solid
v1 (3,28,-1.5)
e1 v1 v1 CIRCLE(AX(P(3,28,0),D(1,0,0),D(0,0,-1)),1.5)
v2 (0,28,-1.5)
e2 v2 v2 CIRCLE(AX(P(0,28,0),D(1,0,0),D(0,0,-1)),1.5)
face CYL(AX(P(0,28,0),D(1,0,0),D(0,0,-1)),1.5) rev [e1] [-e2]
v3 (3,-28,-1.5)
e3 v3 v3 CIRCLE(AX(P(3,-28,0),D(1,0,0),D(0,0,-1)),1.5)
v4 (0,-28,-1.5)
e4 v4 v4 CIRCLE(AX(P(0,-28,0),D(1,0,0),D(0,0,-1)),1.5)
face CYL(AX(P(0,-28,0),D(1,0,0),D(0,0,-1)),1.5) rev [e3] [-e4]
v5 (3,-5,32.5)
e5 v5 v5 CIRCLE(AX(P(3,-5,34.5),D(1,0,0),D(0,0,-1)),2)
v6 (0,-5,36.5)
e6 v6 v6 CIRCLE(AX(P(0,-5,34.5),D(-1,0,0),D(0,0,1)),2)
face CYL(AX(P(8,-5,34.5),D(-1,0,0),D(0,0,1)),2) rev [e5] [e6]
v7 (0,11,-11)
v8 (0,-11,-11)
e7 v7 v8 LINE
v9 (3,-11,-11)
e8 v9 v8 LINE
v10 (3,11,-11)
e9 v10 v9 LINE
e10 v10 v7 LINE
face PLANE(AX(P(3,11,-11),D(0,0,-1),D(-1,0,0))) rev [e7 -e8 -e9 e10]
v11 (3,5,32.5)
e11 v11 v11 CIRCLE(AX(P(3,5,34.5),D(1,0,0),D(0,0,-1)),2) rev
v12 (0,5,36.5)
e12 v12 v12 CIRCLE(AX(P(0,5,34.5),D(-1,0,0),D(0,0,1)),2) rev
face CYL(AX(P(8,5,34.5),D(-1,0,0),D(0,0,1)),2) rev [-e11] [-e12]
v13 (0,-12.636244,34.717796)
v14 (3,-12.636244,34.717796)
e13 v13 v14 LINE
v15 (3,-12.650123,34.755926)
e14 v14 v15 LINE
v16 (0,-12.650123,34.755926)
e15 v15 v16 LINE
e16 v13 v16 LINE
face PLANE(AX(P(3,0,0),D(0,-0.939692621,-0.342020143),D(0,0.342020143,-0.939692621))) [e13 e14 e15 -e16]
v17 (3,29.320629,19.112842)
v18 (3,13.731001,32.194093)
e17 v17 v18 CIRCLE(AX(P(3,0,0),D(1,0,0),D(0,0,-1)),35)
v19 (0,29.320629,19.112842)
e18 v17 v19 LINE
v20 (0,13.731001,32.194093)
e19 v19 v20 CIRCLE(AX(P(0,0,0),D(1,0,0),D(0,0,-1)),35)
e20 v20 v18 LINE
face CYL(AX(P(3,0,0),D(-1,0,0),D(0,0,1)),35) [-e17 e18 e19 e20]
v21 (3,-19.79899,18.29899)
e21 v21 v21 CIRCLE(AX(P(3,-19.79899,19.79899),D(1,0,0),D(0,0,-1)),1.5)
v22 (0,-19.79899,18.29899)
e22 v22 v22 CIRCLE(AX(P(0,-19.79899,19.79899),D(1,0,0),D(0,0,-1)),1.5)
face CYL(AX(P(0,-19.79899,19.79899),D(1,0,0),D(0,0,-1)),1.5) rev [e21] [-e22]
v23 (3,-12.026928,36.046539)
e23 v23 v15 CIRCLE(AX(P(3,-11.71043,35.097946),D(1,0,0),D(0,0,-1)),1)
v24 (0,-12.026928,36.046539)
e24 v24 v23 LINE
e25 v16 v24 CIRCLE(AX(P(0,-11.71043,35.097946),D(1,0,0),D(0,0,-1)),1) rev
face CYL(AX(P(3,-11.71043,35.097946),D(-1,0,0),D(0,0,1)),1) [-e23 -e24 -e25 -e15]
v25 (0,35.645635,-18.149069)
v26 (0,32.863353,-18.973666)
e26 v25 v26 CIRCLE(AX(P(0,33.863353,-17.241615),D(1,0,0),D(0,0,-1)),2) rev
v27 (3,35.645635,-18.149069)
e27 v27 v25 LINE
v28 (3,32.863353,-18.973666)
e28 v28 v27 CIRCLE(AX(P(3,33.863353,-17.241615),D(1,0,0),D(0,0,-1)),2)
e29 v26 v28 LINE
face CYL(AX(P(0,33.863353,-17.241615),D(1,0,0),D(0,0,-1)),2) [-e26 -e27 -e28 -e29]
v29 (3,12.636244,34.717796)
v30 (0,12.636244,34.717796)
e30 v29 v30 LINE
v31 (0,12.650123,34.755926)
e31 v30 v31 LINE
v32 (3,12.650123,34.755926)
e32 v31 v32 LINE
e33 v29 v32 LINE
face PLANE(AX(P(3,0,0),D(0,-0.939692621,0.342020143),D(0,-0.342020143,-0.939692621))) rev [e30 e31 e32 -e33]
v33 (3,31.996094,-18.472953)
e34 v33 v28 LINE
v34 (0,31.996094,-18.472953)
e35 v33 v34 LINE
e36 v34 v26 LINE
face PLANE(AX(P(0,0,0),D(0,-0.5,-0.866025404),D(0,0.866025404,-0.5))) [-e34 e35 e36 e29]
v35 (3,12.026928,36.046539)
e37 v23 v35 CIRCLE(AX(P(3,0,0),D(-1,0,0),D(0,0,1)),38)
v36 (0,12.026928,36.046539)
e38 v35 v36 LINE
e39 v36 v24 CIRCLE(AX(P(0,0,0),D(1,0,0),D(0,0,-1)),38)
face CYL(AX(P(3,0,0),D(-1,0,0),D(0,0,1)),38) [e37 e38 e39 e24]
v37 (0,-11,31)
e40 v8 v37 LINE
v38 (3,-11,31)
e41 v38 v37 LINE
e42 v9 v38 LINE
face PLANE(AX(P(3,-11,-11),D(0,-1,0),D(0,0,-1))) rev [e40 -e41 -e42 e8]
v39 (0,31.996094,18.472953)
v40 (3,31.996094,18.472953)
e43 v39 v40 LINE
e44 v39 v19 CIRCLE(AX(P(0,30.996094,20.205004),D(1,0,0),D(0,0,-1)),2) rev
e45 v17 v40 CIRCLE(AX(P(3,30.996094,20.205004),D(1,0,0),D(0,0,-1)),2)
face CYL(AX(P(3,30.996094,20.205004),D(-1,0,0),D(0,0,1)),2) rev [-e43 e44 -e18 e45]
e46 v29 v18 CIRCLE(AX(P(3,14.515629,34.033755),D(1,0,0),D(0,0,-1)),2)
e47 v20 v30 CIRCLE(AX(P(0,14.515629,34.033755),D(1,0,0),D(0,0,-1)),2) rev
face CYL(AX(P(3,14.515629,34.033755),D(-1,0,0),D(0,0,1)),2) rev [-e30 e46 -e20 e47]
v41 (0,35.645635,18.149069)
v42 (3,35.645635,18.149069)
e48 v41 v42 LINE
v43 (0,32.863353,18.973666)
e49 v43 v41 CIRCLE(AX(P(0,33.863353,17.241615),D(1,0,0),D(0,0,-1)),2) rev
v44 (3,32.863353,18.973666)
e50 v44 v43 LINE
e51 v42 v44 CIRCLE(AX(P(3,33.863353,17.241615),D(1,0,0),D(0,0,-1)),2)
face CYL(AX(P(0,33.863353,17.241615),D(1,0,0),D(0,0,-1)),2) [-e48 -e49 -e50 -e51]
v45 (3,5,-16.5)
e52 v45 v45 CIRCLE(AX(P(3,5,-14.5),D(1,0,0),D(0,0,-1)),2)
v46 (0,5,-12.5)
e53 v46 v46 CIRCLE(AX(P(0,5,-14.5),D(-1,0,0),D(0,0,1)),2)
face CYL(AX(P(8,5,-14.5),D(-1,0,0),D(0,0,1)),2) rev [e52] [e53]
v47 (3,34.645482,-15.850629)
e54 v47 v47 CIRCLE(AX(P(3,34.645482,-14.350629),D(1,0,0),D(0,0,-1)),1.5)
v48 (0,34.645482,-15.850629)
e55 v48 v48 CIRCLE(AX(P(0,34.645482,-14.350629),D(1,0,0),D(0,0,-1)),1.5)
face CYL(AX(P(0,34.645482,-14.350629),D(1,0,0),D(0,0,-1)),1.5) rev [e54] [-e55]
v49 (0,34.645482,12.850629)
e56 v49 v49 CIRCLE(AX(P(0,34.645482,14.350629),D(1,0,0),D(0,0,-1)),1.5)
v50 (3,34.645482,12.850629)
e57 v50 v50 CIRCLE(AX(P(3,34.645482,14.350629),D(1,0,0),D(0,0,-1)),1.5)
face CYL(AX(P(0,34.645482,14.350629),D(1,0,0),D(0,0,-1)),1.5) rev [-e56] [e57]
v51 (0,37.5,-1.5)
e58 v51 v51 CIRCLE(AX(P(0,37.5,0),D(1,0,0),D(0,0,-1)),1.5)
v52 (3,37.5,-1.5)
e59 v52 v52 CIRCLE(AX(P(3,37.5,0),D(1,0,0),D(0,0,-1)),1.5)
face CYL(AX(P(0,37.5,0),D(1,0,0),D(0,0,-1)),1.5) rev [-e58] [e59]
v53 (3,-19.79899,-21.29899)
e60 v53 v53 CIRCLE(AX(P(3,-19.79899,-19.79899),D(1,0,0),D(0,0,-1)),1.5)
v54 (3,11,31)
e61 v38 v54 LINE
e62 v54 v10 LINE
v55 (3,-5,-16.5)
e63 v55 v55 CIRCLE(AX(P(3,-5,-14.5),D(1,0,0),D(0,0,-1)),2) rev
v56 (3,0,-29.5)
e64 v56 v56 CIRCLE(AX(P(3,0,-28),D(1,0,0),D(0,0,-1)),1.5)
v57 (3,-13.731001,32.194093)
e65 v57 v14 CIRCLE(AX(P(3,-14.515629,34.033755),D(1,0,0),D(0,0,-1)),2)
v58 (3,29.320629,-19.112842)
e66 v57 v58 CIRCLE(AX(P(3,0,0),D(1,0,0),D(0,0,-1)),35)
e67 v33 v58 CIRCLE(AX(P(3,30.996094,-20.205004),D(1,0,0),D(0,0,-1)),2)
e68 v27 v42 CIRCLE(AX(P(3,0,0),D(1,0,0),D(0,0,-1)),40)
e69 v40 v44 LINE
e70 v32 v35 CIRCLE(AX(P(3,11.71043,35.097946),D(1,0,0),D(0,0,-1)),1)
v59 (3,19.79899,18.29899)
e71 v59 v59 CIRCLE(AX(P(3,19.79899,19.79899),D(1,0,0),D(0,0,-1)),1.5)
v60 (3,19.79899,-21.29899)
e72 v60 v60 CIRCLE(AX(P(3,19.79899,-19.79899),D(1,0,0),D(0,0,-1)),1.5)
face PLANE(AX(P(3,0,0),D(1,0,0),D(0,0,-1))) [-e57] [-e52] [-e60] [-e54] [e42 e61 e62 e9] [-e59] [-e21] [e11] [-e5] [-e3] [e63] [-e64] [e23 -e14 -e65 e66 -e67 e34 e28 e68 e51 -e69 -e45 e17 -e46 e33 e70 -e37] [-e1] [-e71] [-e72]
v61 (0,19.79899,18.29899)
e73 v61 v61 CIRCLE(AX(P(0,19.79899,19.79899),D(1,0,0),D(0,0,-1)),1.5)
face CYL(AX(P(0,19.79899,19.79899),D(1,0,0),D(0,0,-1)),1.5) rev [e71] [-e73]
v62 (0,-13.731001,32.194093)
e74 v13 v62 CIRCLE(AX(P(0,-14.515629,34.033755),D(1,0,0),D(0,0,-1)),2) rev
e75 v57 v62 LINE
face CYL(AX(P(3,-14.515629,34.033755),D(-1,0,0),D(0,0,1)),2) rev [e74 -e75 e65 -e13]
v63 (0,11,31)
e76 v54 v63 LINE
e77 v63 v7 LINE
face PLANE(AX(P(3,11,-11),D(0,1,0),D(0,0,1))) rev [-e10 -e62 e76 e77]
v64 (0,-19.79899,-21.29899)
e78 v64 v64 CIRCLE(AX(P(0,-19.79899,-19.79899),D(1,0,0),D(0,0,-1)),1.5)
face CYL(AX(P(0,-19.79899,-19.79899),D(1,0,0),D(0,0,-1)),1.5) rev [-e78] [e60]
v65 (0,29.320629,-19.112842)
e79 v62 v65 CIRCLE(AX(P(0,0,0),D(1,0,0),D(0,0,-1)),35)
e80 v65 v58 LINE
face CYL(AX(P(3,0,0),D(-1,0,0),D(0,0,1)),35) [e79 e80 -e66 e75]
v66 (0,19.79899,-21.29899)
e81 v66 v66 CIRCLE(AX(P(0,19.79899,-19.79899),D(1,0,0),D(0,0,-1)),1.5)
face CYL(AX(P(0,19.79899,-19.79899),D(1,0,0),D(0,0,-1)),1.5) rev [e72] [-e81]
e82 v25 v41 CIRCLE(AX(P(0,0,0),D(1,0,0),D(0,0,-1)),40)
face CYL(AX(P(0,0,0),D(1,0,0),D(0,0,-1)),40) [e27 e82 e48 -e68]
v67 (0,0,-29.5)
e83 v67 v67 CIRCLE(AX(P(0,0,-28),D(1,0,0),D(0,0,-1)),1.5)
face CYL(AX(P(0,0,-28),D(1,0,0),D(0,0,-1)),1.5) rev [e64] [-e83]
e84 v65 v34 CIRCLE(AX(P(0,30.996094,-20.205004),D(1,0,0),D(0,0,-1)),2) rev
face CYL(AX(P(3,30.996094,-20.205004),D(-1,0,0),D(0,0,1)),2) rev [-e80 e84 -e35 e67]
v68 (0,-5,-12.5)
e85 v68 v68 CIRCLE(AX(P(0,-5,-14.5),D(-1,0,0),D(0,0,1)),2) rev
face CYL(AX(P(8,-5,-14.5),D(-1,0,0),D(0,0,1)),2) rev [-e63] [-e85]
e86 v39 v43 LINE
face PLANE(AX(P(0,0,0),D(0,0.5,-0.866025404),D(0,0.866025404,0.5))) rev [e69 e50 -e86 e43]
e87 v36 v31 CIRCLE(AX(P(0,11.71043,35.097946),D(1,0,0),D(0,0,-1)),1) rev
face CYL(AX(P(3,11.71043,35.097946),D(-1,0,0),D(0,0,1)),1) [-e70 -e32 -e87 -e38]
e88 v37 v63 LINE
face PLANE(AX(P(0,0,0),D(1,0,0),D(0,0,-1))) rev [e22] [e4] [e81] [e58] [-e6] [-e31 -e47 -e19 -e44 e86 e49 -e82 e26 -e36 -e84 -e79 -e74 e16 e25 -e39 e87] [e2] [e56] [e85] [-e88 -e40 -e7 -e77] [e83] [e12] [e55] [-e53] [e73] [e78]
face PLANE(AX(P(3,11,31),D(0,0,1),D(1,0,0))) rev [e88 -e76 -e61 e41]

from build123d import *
from build123d.topology import SkipClean

# Parameters (mm, degrees)
SKETCH_1_R               = 35
EXTRUDE_1_DEPTH          = 3
SKETCH_2_R               = 1.5
CUT_EXTRUDE_1_DEPTH      = 3
SKETCH_3_R               = 1.5
CUT_EXTRUDE_2_DEPTH      = 3
SKETCH_4_R               = 12.5
CUT_EXTRUDE_3_DEPTH      = 3
EXTRUDE_START            = -3
EXTRUDE_4_DEPTH          = 3
FILLET_1_R               = 2
FILLET_2_R               = 2
FILLET_3_R               = 2
FILLET_4_R               = 2
SKETCH_6_R               = 1.5
CUT_EXTRUDE_4_DEPTH      = 3
SKETCH_7_R               = 2
CUT_EXTRUDE_5_DEPTH      = 8
EXTRUDE_7_DEPTH          = 3
SKETCH_10_W              = 42
SKETCH_10_H              = 22
CUT_EXTRUDE_6_DEPTH      = 3
SKETCH_11_R              = 12.5
SKETCH_11_R_2            = 1.5
EXTRUDE_9_DEPTH          = 3
SKETCH_12_W              = 42
SKETCH_12_H              = 22
CUT_EXTRUDE_7_DEPTH      = 3
EXTRUDE_11_DEPTH         = 3
SKETCH_14_R              = 1.5
EXTRUDE_12_DEPTH         = 3
FILLET_5_R               = 2
FILLET_6_R               = 2
FILLET_7_R               = 2
FILLET_8_R               = 2
CUT_EXTRUDE_8_DEPTH      = 57.648036153
CUT_EXTRUDE_8_DEPTH_BACK = 57.648036153
FILLET_9_R               = 1
FILLET_10_R              = 1


with BuildPart() as part:
    # 草图1 → 凸台-拉伸1 (new body)
    with BuildSketch(Plane(origin=(0, 0, 0), x_dir=(0, 0, -1), z_dir=(1, 0, 0))):
        Circle(SKETCH_1_R)
    extrude(amount=EXTRUDE_1_DEPTH)

    # 草图2 → 切除-拉伸1 (cut)
    with BuildSketch(Plane(origin=(3, 0, 0), x_dir=(0, 0, -1), z_dir=(1, 0, 0))):
        with Locations((0, 28)):
            Circle(SKETCH_2_R)
        with Locations((19.798989873, 19.798989873)):
            Circle(SKETCH_2_R)
        with Locations((28, 0)):
            Circle(SKETCH_2_R)
        with Locations((19.798989873, -19.798989873)):
            Circle(SKETCH_2_R)
        with Locations((0, -28)):
            Circle(SKETCH_2_R)
        with Locations((-19.798989873, -19.798989873)):
            Circle(SKETCH_2_R)
        with Locations((-28, 0)):
            Circle(SKETCH_2_R)
        with Locations((-19.798989873, 19.798989873)):
            Circle(SKETCH_2_R)
    extrude(amount=-CUT_EXTRUDE_1_DEPTH, mode=Mode.SUBTRACT)

    # 草图3 → 切除-拉伸2 (cut)
    with BuildSketch(Plane(origin=(3, 0, 0), x_dir=(0, 0, -1), z_dir=(1, 0, 0))):
        with Locations((0, 17.5)):
            Circle(SKETCH_3_R)
        with Locations((12.374368671, 12.374368671)):
            Circle(SKETCH_3_R)
        with Locations((17.5, 0)):
            Circle(SKETCH_3_R)
        with Locations((12.374368671, -12.374368671)):
            Circle(SKETCH_3_R)
        with Locations((0, -17.5)):
            Circle(SKETCH_3_R)
        with Locations((-12.374368671, -12.374368671)):
            Circle(SKETCH_3_R)
        with Locations((-17.5, 0)):
            Circle(SKETCH_3_R)
        with Locations((-12.374368671, 12.374368671)):
            Circle(SKETCH_3_R)
    extrude(amount=-CUT_EXTRUDE_2_DEPTH, mode=Mode.SUBTRACT)

    # 草图4 → 切除-拉伸3 (cut)
    with BuildSketch(Plane.ZY):
        Circle(SKETCH_4_R)
    extrude(amount=-CUT_EXTRUDE_3_DEPTH, mode=Mode.SUBTRACT)

    # 草图5 → 凸台-拉伸4 (add)
    with BuildSketch(Plane(origin=(3, 0, 0), x_dir=(0, 0, -1), z_dir=(1, 0, 0)).offset(EXTRUDE_START)):
        with BuildLine():
            Line((-20, 34.641016151), (-17.5, 30.310889132))
            ThreePointArc((-17.5, 30.310889132), (-9.058666579, 33.80740392), (0, 35))
            Line((0, 35), (0, 40))
            ThreePointArc((0, 40), (-10.352761804, 38.637033052), (-20, 34.641016151))
        make_face()
        with BuildLine():
            ThreePointArc((0, 35), (9.058666579, 33.80740392), (17.5, 30.310889132))
            Line((17.5, 30.310889132), (20, 34.641016151))
            ThreePointArc((20, 34.641016151), (10.352761804, 38.637033052), (0, 40))
            Line((0, 40), (0, 35))
        make_face()
    extrude(amount=EXTRUDE_4_DEPTH)

    # 圆角1
    fillet_1_edges = [part.edges().sort_by_distance(p)[0] for p in [
        (1.5, 34.641016151, 20),
    ]]
    fillet(fillet_1_edges, radius=FILLET_1_R)

    # 圆角2
    fillet_2_edges = [part.edges().sort_by_distance(p)[0] for p in [
        (1.5, 30.310889132, 17.5),
    ]]
    fillet(fillet_2_edges, radius=FILLET_2_R)

    # 圆角3
    fillet_3_edges = [part.edges().sort_by_distance(p)[0] for p in [
        (1.5, 30.310889132, -17.5),
    ]]
    fillet(fillet_3_edges, radius=FILLET_3_R)

    # 圆角4
    fillet_4_edges = [part.edges().sort_by_distance(p)[0] for p in [
        (1.5, 34.641016151, -20),
    ]]
    fillet(fillet_4_edges, radius=FILLET_4_R)

    # 草图6 → 切除-拉伸4 (cut)
    with BuildSketch(Plane(origin=(3, 0, 0), x_dir=(0, 0, -1), z_dir=(1, 0, 0))):
        with Locations((0, 37.5)):
            Circle(SKETCH_6_R)
        with Locations((14.350628714, 34.645482469)):
            Circle(SKETCH_6_R)
        with Locations((-14.350628714, 34.645482469)):
            Circle(SKETCH_6_R)
    extrude(amount=-CUT_EXTRUDE_4_DEPTH, mode=Mode.SUBTRACT)

    # 草图7 → 切除-拉伸5 (cut)
    with BuildSketch(Plane.ZY):
        with Locations((-14.5, 5)):
            Circle(SKETCH_7_R)
        with Locations((-14.5, -5)):
            Circle(SKETCH_7_R)
        with Locations((34.5, -5)):
            Circle(SKETCH_7_R)
        with Locations((34.5, 5)):
            Circle(SKETCH_7_R)
    extrude(amount=-CUT_EXTRUDE_5_DEPTH, mode=Mode.SUBTRACT)

    # 草图8 → 凸台-拉伸7 (add)
    with SkipClean():  # the faces are left unmerged after this step: merging them gives an invalid solid
        with BuildSketch(Plane.ZY):
            with BuildLine():
                Line((37.587704831, 13.680805733), (32.889241728, 11.970705016))
                ThreePointArc((32.889241728, 11.970705016), (33.684327683, 9.506106909), (34.295004854, 6.989466509))
                ThreePointArc((34.295004854, 6.989466509), (35.839777912, 6.484922606), (36.5, 5))
                ThreePointArc((36.5, 5), (36.038906483, 3.722593707), (34.868233163, 3.034191175))
                ThreePointArc((34.868233163, 3.034191175), (35, 0), (34.868233163, -3.034191175))
                ThreePointArc((34.868233163, -3.034191175), (36.038906483, -3.722593707), (36.5, -5))
                ThreePointArc((36.5, -5), (35.839777912, -6.484922606), (34.295004854, -6.989466509))
                ThreePointArc((34.295004854, -6.989466509), (33.684327683, -9.506106909), (32.889241728, -11.970705016))
                Line((32.889241728, -11.970705016), (37.587704831, -13.680805733))
                ThreePointArc((37.587704831, -13.680805733), (39.39231012, -6.945927107), (40, 0))
                ThreePointArc((40, 0), (39.39231012, 6.945927107), (37.587704831, 13.680805733))
            make_face()
        extrude(amount=-EXTRUDE_7_DEPTH)

    # 草图10 → 切除-拉伸6 (cut)
    with SkipClean():  # the faces are left unmerged after this step: merging them gives an invalid solid
        with BuildSketch(Plane.ZY):
            with Locations((10, 0)):
                Rectangle(SKETCH_10_W, SKETCH_10_H)
        extrude(amount=-CUT_EXTRUDE_6_DEPTH, mode=Mode.SUBTRACT)

    # 草图11 → 凸台-拉伸9 (add)
    with SkipClean():  # the faces are left unmerged after this step: merging them gives an invalid solid
        with BuildSketch(Plane.ZY):
            Circle(SKETCH_11_R)
            with Locations((-17.5, 0)):
                Circle(SKETCH_11_R_2)
        extrude(amount=-EXTRUDE_9_DEPTH)

    # 草图12 → 切除-拉伸7 (cut)
    with SkipClean():  # the faces are left unmerged after this step: merging them gives an invalid solid
        with BuildSketch(Plane.ZY):
            with Locations((10, 0)):
                Rectangle(SKETCH_12_W, SKETCH_12_H)
        extrude(amount=-CUT_EXTRUDE_7_DEPTH, mode=Mode.SUBTRACT)

    # 草图13 → 凸台-拉伸11 (add)
    with SkipClean():  # the faces are left unmerged after this step: merging them gives an invalid solid
        with BuildSketch(Plane.ZY.offset(EXTRUDE_START)):
            with BuildLine():
                ThreePointArc((13.874368671, 12.374368671), (11.553207108, 13.629635052), (11.773443753, 11))
                Line((11.773443753, 11), (12.975293589, 11))
                ThreePointArc((12.975293589, 11), (13.629635052, 11.553207108), (13.874368671, 12.374368671))
            make_face()
            with BuildLine():
                Line((12.975293589, -11), (11.773443753, -11))
                ThreePointArc((11.773443753, -11), (11.553207108, -13.629635052), (13.874368671, -12.374368671))
                ThreePointArc((13.874368671, -12.374368671), (13.629635052, -11.553207108), (12.975293589, -11))
            make_face()
        extrude(amount=EXTRUDE_11_DEPTH)

    # 草图14 → 凸台-拉伸12 (add)
    with SkipClean():  # the faces are left unmerged after this step: merging them gives an invalid solid
        with BuildSketch(Plane.ZY.offset(EXTRUDE_START)):
            with Locations((-12.374368671, 12.374368671)):
                Circle(SKETCH_14_R)
            with Locations((0, 17.5)):
                Circle(SKETCH_14_R)
            with Locations((-12.374368671, -12.374368671)):
                Circle(SKETCH_14_R)
            with Locations((0, -17.5)):
                Circle(SKETCH_14_R)
        extrude(amount=EXTRUDE_12_DEPTH)

    # 圆角5
    fillet_5_edges = [part.edges().sort_by_distance(p)[0] for p in [
        (1.5, 13.680805733, 37.587704831),
    ]]
    fillet(fillet_5_edges, radius=FILLET_5_R)

    # 圆角6
    fillet_6_edges = [part.edges().sort_by_distance(p)[0] for p in [
        (1.5, -11.970705016, 32.889241728),
    ]]
    fillet(fillet_6_edges, radius=FILLET_6_R)

    # 圆角7
    fillet_7_edges = [part.edges().sort_by_distance(p)[0] for p in [
        (1.5, 11.970705016, 32.889241728),
    ]]
    fillet(fillet_7_edges, radius=FILLET_7_R)

    # 圆角8
    fillet_8_edges = [part.edges().sort_by_distance(p)[0] for p in [
        (1.5, -13.680805733, 37.587704831),
    ]]
    fillet(fillet_8_edges, radius=FILLET_8_R)

    # 草图15 → 切除-拉伸8 (cut, two sides: drawn at the far end of the back side and taken through both)
    with SkipClean():  # the faces are left unmerged after this step: merging them gives an invalid solid
        with BuildSketch(Plane.ZY.offset(-CUT_EXTRUDE_8_DEPTH_BACK)):
            with BuildLine():
                ThreePointArc((38.255650602, 11.683543854), (37.259018757, 12.877193403), (35.70855681, 12.996113672))
                ThreePointArc((35.70855681, 12.996113672), (37.422754834, 6.598289219), (38, 0))
                ThreePointArc((38, 0), (37.422754834, -6.598289219), (35.70855681, -12.996113672))
                ThreePointArc((35.70855681, -12.996113672), (37.259018757, -12.877193403), (38.255650602, -11.683543854))
                ThreePointArc((38.255650602, -11.683543854), (39.561509224, -5.906520799), (40, 0))
                ThreePointArc((40, 0), (39.561509224, 5.906520799), (38.255650602, 11.683543854))
            make_face()
        extrude(amount=CUT_EXTRUDE_8_DEPTH + CUT_EXTRUDE_8_DEPTH_BACK, mode=Mode.SUBTRACT)

    # 圆角9
    # the kernel refuses this fillet: 1 mm, written as the material it takes off along each edge
    with BuildSketch(Plane(origin=(5.566068235, 12.996113672, 35.70855681), x_dir=(0, -0.3413769828349391, -0.9399264628631933), z_dir=(-1, 0, 0))) as fillet_9_piece_1:
        with BuildLine():
            CenterArc((1.012831861, 0.999999766), FILLET_9_R, 178.49048731, 91.548723167)
            Line((0.013178896, 1.026342685), (-0.0867864, 1.028976977))
            ThreePointArc((-0.0867864, 1.028976977), (-0.096867816, 0.5144998), (-0.099999978, -6.661e-05))
            Line((-0.099999978, -6.661e-05), (-0.002564992, -0.099967099))
            ThreePointArc((-0.002564992, -0.099967099), (0.052736969, -0.100657535), (1.013584648, -0.099999977))
            Line((1.013584648, -0.099999977), (1.013516213, 0))
        make_face()
    extrude(amount=8.132136469, mode=Mode.SUBTRACT)

    # 圆角10
    # the kernel refuses this fillet: 1 mm, written as the material it takes off along each edge
    with BuildSketch(Plane(origin=(-2.566068235, -12.996113672, 35.70855681), x_dir=(0, 0.9442321213290604, 0.3292805810405803), z_dir=(1, 0, 0))) as fillet_10_piece_1:
        with BuildLine():
            CenterArc((1.012921672, -0.999908795), FILLET_10_R, 89.226161317, 91.548723167)
            Line((0.013013123, -1.013432668), (-0.086977731, -1.014785056))
            ThreePointArc((-0.086977731, -1.014785056), (-0.099972117, -0.054025023), (-0.099991792, 0.001281244))
            Line((-0.099991792, 0.001281244), (-0.001350562, 0.099990879))
            ThreePointArc((-0.001350562, 0.099990879), (0.513213647, 0.103465793), (1.027777856, 0.099990879))
            Line((1.027777856, 0.099990879), (1.026427294, 0))
        make_face()
    extrude(amount=8.132136469, mode=Mode.SUBTRACT)


solid = part.part
